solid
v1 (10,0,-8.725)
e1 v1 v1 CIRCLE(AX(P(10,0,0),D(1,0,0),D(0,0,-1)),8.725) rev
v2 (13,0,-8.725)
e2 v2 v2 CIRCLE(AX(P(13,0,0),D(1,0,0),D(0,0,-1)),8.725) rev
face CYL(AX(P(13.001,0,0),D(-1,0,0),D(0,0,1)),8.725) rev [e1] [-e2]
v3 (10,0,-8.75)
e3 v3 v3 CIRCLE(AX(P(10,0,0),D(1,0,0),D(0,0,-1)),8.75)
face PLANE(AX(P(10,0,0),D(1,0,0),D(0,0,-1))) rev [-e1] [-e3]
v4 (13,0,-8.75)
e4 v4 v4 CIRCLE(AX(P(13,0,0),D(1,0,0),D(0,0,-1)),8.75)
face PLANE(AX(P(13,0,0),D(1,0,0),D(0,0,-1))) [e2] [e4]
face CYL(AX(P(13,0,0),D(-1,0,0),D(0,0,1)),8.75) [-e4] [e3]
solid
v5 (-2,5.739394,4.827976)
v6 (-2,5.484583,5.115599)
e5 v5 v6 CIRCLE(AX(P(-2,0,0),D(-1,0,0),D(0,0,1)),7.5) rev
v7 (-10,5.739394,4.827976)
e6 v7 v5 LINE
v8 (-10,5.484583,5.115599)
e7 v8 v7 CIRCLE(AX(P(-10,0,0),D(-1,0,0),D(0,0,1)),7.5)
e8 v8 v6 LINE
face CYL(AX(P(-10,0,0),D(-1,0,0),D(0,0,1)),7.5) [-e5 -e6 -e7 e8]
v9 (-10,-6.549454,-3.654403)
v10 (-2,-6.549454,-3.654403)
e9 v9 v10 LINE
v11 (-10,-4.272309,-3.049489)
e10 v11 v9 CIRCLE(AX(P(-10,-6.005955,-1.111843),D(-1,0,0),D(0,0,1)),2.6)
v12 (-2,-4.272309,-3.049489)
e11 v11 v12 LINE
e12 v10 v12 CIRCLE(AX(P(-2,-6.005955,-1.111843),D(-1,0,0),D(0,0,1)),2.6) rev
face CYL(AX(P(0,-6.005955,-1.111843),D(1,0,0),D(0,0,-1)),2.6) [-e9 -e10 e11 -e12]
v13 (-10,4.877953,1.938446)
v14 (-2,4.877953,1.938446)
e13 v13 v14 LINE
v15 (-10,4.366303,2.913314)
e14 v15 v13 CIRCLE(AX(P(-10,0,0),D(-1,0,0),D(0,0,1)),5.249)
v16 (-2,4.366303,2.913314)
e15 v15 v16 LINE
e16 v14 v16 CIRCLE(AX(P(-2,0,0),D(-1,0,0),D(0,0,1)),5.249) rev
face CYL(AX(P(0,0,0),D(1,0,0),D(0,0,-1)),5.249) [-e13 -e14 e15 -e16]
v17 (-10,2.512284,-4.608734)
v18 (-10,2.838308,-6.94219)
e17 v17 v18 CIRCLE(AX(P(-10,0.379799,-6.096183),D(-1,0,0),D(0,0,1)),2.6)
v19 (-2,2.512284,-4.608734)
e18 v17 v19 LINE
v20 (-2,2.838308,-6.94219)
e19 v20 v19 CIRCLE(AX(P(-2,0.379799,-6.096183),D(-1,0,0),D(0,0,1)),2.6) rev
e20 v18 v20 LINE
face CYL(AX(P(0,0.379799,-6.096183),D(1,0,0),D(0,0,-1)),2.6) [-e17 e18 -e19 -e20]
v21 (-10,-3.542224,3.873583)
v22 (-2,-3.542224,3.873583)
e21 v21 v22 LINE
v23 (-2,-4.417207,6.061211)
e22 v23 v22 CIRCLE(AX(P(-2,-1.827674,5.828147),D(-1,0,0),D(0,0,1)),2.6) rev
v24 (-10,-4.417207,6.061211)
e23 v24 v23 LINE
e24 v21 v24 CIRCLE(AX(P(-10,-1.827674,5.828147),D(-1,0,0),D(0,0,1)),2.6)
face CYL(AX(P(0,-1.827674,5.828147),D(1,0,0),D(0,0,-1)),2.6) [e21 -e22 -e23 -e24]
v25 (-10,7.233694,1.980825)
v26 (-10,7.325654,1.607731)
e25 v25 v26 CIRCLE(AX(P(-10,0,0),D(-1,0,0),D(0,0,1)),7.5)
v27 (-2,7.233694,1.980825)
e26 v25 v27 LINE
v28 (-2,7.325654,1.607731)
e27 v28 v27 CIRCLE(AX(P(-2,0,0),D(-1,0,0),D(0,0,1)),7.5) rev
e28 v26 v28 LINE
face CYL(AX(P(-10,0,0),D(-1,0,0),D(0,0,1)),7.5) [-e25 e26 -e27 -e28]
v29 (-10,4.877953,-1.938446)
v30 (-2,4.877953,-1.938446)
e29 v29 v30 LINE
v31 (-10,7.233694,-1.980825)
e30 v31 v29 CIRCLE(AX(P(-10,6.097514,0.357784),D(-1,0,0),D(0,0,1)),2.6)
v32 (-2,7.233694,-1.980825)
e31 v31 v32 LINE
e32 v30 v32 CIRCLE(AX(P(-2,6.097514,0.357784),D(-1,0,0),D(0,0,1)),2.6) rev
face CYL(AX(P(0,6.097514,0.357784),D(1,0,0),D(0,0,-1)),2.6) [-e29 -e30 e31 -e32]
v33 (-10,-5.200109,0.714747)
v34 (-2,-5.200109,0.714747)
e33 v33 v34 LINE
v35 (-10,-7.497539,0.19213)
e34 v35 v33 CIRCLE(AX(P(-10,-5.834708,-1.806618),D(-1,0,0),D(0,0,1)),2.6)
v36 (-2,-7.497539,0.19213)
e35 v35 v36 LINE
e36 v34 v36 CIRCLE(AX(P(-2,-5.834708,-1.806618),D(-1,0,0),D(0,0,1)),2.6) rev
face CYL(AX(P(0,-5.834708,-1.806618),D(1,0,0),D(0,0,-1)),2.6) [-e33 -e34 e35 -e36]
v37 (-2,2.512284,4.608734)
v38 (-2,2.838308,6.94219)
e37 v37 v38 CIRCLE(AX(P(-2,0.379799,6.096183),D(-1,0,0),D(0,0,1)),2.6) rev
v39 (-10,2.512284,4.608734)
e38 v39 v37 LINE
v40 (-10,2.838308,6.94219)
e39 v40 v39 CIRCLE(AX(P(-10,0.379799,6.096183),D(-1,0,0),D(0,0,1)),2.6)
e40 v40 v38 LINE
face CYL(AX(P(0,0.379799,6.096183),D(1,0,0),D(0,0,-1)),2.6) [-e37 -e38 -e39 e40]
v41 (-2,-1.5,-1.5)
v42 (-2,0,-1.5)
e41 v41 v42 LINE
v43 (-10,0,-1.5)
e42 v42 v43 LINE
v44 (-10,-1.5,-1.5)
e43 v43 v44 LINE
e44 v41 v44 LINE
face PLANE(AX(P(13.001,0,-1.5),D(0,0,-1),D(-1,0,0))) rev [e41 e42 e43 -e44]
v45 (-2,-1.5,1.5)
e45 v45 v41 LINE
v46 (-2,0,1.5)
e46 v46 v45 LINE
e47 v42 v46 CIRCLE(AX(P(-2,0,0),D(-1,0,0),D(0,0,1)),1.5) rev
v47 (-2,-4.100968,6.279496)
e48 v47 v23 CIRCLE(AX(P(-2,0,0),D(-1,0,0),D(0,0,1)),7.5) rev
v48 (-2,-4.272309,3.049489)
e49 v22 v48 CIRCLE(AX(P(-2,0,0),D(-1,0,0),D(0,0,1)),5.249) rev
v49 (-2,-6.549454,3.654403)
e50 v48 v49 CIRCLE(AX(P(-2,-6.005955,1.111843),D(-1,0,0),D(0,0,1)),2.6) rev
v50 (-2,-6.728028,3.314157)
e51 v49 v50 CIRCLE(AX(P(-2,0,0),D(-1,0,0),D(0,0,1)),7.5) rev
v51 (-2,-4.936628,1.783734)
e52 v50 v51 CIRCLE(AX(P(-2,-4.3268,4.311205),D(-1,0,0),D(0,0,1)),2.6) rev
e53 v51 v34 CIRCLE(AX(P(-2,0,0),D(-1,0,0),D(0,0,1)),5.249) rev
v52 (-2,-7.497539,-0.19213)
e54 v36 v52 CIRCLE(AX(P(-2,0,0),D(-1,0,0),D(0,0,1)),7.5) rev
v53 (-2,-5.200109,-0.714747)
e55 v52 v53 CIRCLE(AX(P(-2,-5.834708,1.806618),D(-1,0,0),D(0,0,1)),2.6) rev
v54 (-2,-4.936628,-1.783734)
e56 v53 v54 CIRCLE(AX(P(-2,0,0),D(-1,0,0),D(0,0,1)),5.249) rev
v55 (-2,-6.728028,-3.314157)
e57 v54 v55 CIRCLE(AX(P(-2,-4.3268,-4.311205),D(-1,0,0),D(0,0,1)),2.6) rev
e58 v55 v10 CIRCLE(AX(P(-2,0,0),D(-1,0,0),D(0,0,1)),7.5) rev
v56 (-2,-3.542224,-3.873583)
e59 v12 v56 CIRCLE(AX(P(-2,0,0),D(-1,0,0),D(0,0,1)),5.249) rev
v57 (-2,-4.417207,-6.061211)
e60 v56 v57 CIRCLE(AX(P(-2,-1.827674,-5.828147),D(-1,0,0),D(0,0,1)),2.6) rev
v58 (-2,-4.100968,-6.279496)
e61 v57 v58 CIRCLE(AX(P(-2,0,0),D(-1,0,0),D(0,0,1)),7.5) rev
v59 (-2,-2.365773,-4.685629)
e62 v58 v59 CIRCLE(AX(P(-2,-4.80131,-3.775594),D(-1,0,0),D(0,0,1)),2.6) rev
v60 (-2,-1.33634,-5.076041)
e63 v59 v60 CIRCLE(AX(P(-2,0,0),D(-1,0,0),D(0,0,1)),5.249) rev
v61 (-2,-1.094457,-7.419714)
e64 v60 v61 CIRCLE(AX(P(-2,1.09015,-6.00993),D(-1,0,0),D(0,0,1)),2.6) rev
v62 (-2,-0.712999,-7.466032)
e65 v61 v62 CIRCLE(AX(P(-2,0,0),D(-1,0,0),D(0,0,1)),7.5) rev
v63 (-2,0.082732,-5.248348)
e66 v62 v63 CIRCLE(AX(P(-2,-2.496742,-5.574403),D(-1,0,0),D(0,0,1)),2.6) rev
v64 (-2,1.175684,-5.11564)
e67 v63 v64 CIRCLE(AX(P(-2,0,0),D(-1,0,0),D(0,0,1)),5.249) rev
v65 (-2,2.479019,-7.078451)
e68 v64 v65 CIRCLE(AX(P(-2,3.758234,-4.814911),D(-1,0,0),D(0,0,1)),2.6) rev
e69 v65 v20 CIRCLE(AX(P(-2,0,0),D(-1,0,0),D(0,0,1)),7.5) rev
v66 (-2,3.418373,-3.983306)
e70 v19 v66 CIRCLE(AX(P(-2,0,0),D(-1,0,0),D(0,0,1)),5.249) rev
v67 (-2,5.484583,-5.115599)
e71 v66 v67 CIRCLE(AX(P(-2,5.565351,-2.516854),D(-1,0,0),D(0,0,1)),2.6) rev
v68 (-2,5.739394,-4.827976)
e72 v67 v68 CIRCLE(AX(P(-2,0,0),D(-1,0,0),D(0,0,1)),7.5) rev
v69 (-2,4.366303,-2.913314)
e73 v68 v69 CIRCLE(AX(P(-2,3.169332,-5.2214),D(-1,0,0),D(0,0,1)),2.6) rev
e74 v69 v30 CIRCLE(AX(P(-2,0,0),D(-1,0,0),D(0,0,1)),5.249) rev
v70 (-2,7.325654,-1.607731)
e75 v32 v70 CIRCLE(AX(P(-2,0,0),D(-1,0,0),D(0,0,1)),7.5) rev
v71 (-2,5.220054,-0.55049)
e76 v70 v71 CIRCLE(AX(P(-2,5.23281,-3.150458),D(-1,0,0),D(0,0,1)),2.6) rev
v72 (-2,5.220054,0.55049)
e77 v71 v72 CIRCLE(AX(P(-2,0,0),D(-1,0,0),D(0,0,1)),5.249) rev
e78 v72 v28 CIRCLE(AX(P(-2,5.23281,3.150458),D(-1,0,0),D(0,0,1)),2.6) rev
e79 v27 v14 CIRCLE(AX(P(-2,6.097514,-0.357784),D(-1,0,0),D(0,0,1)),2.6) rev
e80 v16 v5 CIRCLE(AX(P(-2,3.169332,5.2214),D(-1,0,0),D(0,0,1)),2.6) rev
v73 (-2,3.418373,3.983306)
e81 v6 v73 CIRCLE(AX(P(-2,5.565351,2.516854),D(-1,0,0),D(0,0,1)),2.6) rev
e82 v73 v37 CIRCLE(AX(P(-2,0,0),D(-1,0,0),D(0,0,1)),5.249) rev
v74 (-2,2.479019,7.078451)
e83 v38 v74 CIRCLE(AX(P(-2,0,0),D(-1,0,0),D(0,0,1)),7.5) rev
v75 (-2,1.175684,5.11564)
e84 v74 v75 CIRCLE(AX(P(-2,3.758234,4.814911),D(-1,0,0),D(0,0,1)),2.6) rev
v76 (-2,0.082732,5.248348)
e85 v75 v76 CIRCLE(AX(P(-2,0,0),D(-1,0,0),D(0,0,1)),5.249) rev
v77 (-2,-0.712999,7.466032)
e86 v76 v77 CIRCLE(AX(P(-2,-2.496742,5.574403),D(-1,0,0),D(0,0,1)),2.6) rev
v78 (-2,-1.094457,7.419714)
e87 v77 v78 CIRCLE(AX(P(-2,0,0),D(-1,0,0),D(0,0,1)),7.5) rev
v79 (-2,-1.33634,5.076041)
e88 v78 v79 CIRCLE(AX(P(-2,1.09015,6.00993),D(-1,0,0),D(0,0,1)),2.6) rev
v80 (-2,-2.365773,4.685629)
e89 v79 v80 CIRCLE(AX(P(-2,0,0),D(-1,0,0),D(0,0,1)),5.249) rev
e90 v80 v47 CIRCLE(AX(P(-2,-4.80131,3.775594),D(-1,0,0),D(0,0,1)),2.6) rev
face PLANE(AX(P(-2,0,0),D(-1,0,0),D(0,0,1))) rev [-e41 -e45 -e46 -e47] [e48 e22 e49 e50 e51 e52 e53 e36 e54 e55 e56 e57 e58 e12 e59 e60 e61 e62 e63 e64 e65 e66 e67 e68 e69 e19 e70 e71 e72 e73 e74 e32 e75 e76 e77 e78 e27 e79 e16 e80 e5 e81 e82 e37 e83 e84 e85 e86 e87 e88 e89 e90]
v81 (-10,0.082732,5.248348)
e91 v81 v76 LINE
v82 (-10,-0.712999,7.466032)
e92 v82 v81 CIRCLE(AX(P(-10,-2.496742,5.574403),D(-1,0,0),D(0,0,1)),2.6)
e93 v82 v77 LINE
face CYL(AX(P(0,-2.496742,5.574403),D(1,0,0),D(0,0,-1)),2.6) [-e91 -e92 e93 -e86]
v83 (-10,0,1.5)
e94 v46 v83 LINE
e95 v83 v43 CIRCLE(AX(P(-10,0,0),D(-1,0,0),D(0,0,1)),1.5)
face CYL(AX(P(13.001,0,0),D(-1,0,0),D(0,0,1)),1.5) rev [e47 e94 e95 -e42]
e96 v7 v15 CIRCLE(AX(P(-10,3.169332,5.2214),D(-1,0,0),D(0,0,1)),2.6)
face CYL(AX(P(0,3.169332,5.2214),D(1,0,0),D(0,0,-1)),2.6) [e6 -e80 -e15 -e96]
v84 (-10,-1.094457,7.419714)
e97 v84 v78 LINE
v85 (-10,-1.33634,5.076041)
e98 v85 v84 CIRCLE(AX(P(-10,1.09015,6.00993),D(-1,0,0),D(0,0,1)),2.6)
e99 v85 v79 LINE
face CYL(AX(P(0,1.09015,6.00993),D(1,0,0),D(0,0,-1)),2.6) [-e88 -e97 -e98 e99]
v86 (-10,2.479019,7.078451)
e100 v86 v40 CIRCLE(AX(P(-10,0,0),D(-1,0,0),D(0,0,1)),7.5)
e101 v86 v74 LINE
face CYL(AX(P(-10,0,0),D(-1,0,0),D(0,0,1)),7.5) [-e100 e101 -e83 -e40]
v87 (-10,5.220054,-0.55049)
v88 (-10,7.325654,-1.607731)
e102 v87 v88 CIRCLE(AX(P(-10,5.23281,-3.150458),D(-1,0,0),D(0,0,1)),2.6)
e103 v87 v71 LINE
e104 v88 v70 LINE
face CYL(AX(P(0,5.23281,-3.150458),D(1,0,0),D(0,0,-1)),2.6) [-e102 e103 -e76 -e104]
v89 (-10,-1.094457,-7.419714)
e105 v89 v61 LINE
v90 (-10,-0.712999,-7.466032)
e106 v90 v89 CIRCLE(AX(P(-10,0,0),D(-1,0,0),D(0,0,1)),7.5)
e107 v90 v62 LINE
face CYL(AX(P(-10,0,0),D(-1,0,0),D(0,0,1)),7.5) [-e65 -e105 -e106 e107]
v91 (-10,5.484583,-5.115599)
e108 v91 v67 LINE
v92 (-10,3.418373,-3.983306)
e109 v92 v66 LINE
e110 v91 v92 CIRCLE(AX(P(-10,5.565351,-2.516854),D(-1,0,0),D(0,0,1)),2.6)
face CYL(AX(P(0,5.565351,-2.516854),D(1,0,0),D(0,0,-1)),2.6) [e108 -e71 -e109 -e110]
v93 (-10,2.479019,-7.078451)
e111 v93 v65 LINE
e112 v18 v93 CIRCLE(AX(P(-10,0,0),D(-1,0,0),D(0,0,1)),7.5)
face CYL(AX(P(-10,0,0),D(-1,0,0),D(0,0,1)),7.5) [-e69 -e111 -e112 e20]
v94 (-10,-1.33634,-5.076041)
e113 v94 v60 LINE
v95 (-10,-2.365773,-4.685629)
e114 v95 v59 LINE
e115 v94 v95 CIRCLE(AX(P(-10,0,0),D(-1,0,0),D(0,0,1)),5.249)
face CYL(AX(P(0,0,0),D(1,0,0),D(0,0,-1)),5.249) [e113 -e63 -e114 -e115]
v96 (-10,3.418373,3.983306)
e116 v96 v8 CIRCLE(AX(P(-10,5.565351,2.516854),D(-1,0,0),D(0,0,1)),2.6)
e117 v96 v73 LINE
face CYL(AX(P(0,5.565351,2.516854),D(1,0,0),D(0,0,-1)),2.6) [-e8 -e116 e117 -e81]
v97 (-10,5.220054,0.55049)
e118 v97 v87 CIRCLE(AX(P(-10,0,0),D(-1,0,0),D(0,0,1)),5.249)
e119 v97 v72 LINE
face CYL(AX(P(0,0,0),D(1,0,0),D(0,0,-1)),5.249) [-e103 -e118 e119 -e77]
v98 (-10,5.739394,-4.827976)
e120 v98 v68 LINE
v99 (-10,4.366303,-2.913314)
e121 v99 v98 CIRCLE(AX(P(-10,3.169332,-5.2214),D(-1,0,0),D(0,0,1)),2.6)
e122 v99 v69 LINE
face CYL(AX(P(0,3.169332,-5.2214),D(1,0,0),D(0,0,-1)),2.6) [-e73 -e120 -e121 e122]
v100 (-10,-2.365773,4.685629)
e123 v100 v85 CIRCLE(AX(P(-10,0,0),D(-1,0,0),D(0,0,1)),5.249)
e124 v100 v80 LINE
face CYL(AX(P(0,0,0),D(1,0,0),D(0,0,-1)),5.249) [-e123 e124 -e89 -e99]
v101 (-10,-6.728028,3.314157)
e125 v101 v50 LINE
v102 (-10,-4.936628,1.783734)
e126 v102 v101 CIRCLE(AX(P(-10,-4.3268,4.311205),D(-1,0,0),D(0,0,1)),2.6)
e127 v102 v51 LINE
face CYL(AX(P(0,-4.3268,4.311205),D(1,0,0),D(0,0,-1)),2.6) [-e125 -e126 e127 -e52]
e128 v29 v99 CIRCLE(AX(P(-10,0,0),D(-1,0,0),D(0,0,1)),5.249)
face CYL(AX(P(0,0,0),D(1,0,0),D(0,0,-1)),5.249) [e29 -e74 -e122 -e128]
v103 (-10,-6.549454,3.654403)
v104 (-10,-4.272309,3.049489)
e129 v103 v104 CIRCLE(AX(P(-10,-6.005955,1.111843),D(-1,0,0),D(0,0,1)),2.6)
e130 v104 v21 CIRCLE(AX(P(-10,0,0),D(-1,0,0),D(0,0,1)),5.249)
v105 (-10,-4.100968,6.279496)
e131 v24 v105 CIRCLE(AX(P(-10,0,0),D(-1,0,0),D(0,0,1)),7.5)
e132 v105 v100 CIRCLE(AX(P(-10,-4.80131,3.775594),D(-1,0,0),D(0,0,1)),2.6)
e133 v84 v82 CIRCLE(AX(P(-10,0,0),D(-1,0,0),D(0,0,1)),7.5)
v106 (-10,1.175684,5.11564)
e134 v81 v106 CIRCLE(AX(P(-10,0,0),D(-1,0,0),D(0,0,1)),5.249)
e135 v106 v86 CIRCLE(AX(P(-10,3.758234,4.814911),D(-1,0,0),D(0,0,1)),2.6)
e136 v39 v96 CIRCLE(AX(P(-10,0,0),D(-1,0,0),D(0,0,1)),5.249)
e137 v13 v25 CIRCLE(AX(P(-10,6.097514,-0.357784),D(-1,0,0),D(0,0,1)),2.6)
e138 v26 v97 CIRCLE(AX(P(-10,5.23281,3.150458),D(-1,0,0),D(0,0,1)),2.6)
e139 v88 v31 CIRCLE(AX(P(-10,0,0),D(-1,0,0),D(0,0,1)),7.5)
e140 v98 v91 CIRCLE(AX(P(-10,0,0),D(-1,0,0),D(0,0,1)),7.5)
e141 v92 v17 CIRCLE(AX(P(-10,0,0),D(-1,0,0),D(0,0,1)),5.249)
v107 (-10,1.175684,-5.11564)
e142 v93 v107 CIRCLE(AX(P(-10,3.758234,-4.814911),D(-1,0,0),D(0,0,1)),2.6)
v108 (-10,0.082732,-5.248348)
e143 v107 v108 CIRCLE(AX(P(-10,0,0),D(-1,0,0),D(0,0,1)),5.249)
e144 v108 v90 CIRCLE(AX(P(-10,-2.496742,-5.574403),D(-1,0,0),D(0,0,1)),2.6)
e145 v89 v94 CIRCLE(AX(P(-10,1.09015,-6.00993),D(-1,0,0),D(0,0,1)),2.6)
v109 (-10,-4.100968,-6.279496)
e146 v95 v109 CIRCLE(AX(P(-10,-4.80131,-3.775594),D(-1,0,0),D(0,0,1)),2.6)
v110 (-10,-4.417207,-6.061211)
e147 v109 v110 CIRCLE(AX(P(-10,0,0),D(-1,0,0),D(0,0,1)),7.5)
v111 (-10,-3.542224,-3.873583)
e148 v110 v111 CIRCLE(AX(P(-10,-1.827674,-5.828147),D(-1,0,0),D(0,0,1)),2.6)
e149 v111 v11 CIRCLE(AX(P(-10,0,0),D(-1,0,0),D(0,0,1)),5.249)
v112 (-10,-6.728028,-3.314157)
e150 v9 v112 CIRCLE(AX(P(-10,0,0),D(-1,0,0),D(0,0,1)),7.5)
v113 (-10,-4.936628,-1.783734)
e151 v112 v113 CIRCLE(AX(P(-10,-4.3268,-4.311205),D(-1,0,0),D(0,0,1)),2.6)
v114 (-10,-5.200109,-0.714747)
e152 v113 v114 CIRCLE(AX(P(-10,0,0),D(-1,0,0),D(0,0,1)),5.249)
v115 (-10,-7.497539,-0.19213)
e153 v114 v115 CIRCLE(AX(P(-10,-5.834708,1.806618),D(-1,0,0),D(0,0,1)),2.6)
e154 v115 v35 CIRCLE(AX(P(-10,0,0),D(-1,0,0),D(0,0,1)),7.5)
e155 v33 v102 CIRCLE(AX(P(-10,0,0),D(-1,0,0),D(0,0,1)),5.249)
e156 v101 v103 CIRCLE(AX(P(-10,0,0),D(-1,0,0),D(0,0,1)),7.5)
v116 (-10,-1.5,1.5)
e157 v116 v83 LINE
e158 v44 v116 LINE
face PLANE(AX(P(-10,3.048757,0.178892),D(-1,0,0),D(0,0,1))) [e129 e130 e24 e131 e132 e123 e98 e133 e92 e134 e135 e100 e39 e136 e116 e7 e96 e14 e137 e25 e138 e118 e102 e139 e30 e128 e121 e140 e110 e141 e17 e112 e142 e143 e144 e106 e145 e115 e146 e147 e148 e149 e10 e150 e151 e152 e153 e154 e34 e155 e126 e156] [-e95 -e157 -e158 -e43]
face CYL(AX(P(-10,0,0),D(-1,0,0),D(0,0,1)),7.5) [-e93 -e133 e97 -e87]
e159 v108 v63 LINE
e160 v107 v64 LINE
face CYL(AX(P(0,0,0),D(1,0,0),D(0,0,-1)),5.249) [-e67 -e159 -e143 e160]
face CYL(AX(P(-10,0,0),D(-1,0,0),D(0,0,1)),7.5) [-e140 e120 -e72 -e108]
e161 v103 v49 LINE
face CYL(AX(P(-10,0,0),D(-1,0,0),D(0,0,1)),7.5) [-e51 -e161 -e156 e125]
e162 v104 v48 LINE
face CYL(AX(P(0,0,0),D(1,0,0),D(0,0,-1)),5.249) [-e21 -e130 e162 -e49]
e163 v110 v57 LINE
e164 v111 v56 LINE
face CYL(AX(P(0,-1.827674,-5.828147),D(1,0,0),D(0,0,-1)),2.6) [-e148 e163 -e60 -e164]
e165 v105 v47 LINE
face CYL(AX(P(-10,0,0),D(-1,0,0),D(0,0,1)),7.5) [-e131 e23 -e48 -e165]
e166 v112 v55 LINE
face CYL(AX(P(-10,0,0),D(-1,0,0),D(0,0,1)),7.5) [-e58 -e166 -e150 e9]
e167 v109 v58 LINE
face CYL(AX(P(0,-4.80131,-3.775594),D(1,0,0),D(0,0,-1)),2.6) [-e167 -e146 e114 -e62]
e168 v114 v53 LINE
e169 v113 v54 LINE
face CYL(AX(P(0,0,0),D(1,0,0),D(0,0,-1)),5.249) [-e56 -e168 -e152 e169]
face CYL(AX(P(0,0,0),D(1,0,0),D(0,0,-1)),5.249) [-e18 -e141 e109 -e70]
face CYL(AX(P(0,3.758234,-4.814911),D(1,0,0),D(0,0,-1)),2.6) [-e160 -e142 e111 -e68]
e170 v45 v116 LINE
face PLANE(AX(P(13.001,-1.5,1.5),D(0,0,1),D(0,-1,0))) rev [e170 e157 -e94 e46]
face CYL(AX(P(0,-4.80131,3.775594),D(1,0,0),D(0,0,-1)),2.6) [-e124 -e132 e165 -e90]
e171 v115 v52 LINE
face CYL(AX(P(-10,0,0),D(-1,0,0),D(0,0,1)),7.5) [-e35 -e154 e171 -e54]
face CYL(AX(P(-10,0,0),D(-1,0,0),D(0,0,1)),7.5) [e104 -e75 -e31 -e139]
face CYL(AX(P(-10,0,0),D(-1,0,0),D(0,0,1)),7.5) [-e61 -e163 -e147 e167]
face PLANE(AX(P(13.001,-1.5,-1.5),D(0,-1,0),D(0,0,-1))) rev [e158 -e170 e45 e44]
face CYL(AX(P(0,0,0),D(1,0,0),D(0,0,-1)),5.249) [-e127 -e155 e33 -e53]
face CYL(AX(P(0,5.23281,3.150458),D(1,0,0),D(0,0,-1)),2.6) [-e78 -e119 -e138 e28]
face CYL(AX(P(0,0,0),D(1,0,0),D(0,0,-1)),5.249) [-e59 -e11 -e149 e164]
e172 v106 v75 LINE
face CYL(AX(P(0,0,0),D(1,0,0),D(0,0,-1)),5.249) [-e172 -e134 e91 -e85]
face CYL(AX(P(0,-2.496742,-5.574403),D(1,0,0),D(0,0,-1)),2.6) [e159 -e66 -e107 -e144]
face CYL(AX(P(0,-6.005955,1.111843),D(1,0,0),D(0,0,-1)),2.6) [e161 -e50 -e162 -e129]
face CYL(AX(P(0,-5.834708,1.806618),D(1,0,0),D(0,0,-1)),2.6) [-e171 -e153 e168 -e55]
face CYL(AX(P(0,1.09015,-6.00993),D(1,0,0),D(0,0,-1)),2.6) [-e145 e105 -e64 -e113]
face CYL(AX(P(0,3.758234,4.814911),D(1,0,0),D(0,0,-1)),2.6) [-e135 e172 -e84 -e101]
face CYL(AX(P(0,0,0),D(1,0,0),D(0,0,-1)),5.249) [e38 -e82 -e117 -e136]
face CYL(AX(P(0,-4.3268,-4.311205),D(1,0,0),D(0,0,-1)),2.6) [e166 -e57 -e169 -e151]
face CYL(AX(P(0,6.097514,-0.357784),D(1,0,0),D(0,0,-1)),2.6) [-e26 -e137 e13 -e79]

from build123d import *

# Parameters (mm, degrees)
CUT_EXTRUDE1_START         = -10
CUT_EXTRUDE1_DEPTH         = 10
CUT_EXTRUDE2_DEPTH         = 15.577379737
CUT_EXTRUDE3_DEPTH         = 15.577379737
CUT_EXTRUDE4_DEPTH         = 15.577379737
CUT_EXTRUDE5_DEPTH         = 15.577379737
CUT_EXTRUDE6_DEPTH         = 15.577379737
CUT_EXTRUDE7_DEPTH         = 15.577379737
CUT_EXTRUDE8_DEPTH         = 15.577379737
CUT_EXTRUDE9_DEPTH         = 15.577379737
CUT_EXTRUDE10_DEPTH        = 15.559932415
CUT_EXTRUDE11_DEPTH        = 15.559932415
CUT_EXTRUDE12_DEPTH        = 15.559932415
CUT_EXTRUDE13_DEPTH        = 15.559932415
F_0_8_0_8_DIAMETER_HOLE1_D = 0.8
SKETCH20_R                 = 8.75
BOSS_EXTRUDE2_DEPTH        = 3
BOSS_EXTRUDE3_START        = 10
BOSS_EXTRUDE3_DEPTH        = 10
CUT_EXTRUDE14_REACH        = 21.445
SKETCH23_R                 = 8.725
CUT_EXTRUDE15_DEPTH        = 8


with BuildPart() as part:
    # Cut-Extrude1: read off the stored shape, not the designer's step
    # Cut-Extrude1 outline → Cut-Extrude1 (new body)
    with BuildSketch(Plane(origin=(10, 0, 0), x_dir=(0, 0, -1), z_dir=(1, 0, 0)).offset(CUT_EXTRUDE1_START)):
        with BuildLine():
            ThreePointArc((5.115599083, 5.484582575), (-6.172378994, -4.2604856), (6.942190227, 2.838308449))
            ThreePointArc((6.942190227, 2.838308449), (5.736412412, 2.954786958), (4.608733854, 2.512284471))
            ThreePointArc((4.608733854, 2.512284471), (4.319842312, 2.981771856), (3.983306334, 3.41837266))
            ThreePointArc((3.983306334, 3.41837266), (4.796933675, 4.315856884), (5.115599083, 5.484582575))
        make_face()
    extrude(amount=CUT_EXTRUDE1_DEPTH)

    # Sketch3 → Cut-Extrude2 (cut, through all)
    with BuildSketch(Plane(origin=(10, 0, 0), x_dir=(0, 0, -1), z_dir=(1, 0, 0))):
        with BuildLine():
            ThreePointArc((7.466031873, -0.712999344), (7.445316556, 0.904025102), (7.078450644, 2.479019256))
            ThreePointArc((7.078450644, 2.479019256), (6.253152529, 1.592255251), (5.115639582, 1.175683915))
            ThreePointArc((5.115639582, 1.175683915), (5.21072888, 0.632697035), (5.24834797, 0.082732007))
            ThreePointArc((5.24834797, 0.082732007), (6.452498904, -0.049509856), (7.466031873, -0.712999344))
        make_face()
    extrude(amount=-CUT_EXTRUDE2_DEPTH, mode=Mode.SUBTRACT)

    # Sketch4 → Cut-Extrude3 (cut, through all)
    with BuildSketch(Plane(origin=(10, 0, 0), x_dir=(0, 0, -1), z_dir=(1, 0, 0))):
        with BuildLine():
            ThreePointArc((6.279495593, -4.10096758), (7.01262182, -2.659536653), (7.419714468, -1.094457498))
            ThreePointArc((7.419714468, -1.094457498), (6.276849497, -1.496112872), (5.076041451, -1.336339847))
            ThreePointArc((5.076041451, -1.336339847), (4.907900258, -1.861321052), (4.685628816, -2.365773362))
            ThreePointArc((4.685628816, -2.365773362), (5.690395658, -3.042464558), (6.279495593, -4.10096758))
        make_face()
    extrude(amount=-CUT_EXTRUDE3_DEPTH, mode=Mode.SUBTRACT)

    # Sketch5 → Cut-Extrude4 (cut, through all)
    with BuildSketch(Plane(origin=(10, 0, 0), x_dir=(0, 0, -1), z_dir=(1, 0, 0))):
        with BuildLine():
            ThreePointArc((3.654402549, -6.549453566), (4.973419937, -5.613830611), (6.061211124, -4.41720723))
            ThreePointArc((6.061211124, -4.41720723), (4.862595889, -4.241739566), (3.873583397, -3.542224254))
            ThreePointArc((3.873583397, -3.542224254), (3.480730833, -3.928932917), (3.049488568, -4.272308565))
            ThreePointArc((3.049488568, -4.272308565), (3.624691343, -5.338427296), (3.654402549, -6.549453566))
        make_face()
    extrude(amount=-CUT_EXTRUDE4_DEPTH, mode=Mode.SUBTRACT)

    # Sketch6 → Cut-Extrude5 (cut, through all)
    with BuildSketch(Plane(origin=(10, 0, 0), x_dir=(0, 0, -1), z_dir=(1, 0, 0))):
        with BuildLine():
            ThreePointArc((0.192129921, -7.497538669), (1.794867482, -7.282063631), (3.314157357, -6.728028018))
            ThreePointArc((3.314157357, -6.728028018), (2.334380164, -6.015634844), (1.783734068, -4.936627773))
            ThreePointArc((1.783734068, -4.936627773), (1.256167922, -5.0964736), (0.714747239, -5.200109363))
            ThreePointArc((0.714747239, -5.200109363), (0.728613924, -6.411420676), (0.192129921, -7.497538669))
        make_face()
    extrude(amount=-CUT_EXTRUDE5_DEPTH, mode=Mode.SUBTRACT)

    # Sketch7 → Cut-Extrude6 (cut, through all)
    with BuildSketch(Plane(origin=(10, 0, 0), x_dir=(0, 0, -1), z_dir=(1, 0, 0))):
        with BuildLine():
            ThreePointArc((-3.314157357, -6.728028018), (-1.794867482, -7.282063631), (-0.192129921, -7.497538669))
            ThreePointArc((-0.192129921, -7.497538669), (-0.728613924, -6.411420676), (-0.714747239, -5.200109363))
            ThreePointArc((-0.714747239, -5.200109363), (-1.256167922, -5.0964736), (-1.783734068, -4.936627773))
            ThreePointArc((-1.783734068, -4.936627773), (-2.334380164, -6.015634844), (-3.314157357, -6.728028018))
        make_face()
    extrude(amount=-CUT_EXTRUDE6_DEPTH, mode=Mode.SUBTRACT)

    # Sketch8 → Cut-Extrude7 (cut, through all)
    with BuildSketch(Plane(origin=(10, 0, 0), x_dir=(0, 0, -1), z_dir=(1, 0, 0))):
        with BuildLine():
            ThreePointArc((-6.061211124, -4.41720723), (-4.973419937, -5.613830611), (-3.654402549, -6.549453566))
            ThreePointArc((-3.654402549, -6.549453566), (-3.624691343, -5.338427296), (-3.049488568, -4.272308565))
            ThreePointArc((-3.049488568, -4.272308565), (-3.480730833, -3.928932917), (-3.873583397, -3.542224254))
            ThreePointArc((-3.873583397, -3.542224254), (-4.862595889, -4.241739566), (-6.061211124, -4.41720723))
        make_face()
    extrude(amount=-CUT_EXTRUDE7_DEPTH, mode=Mode.SUBTRACT)

    # Sketch9 → Cut-Extrude8 (cut, through all)
    with BuildSketch(Plane(origin=(10, 0, 0), x_dir=(0, 0, -1), z_dir=(1, 0, 0))):
        with BuildLine():
            ThreePointArc((-7.419714468, -1.094457498), (-7.01262182, -2.659536653), (-6.279495593, -4.10096758))
            ThreePointArc((-6.279495593, -4.10096758), (-5.690395658, -3.042464558), (-4.685628816, -2.365773362))
            ThreePointArc((-4.685628816, -2.365773362), (-4.907900258, -1.861321052), (-5.076041451, -1.336339847))
            ThreePointArc((-5.076041451, -1.336339847), (-6.276849497, -1.496112872), (-7.419714468, -1.094457498))
        make_face()
    extrude(amount=-CUT_EXTRUDE8_DEPTH, mode=Mode.SUBTRACT)

    # Sketch10 → Cut-Extrude9 (cut, through all)
    with BuildSketch(Plane(origin=(10, 0, 0), x_dir=(0, 0, -1), z_dir=(1, 0, 0))):
        with BuildLine():
            ThreePointArc((-7.078450644, 2.479019256), (-7.445316556, 0.904025102), (-7.466031873, -0.712999344))
            ThreePointArc((-7.466031873, -0.712999344), (-6.452498904, -0.049509856), (-5.24834797, 0.082732007))
            ThreePointArc((-5.24834797, 0.082732007), (-5.21072888, 0.632697035), (-5.115639582, 1.175683915))
            ThreePointArc((-5.115639582, 1.175683915), (-6.253152529, 1.592255251), (-7.078450644, 2.479019256))
        make_face()
    extrude(amount=-CUT_EXTRUDE9_DEPTH, mode=Mode.SUBTRACT)

    # Sketch11 → Cut-Extrude10 (cut, through all)
    with BuildSketch(Plane(origin=(10, 0, 0), x_dir=(0, 0, -1), z_dir=(1, 0, 0))):
        with BuildLine():
            ThreePointArc((-5.115599083, 5.484582575), (-6.172378994, 4.2604856), (-6.942190227, 2.838308449))
            ThreePointArc((-6.942190227, 2.838308449), (-5.736412412, 2.954786958), (-4.608733854, 2.512284471))
            ThreePointArc((-4.608733854, 2.512284471), (-4.319842312, 2.981771856), (-3.983306334, 3.41837266))
            ThreePointArc((-3.983306334, 3.41837266), (-4.796933675, 4.315856884), (-5.115599083, 5.484582575))
        make_face()
    extrude(amount=-CUT_EXTRUDE10_DEPTH, mode=Mode.SUBTRACT)

    # Sketch12 → Cut-Extrude11 (cut, through all)
    with BuildSketch(Plane(origin=(10, 0, 0), x_dir=(0, 0, -1), z_dir=(1, 0, 0))):
        with BuildLine():
            ThreePointArc((-1.980825421, 7.233694122), (-3.48542379, 6.640920192), (-4.827976462, 5.739393982))
            ThreePointArc((-4.827976462, 5.739393982), (-3.706182968, 5.282177689), (-2.913314353, 4.366302839))
            ThreePointArc((-2.913314353, 4.366302839), (-2.43933193, 4.647758679), (-1.93844561, 4.877953425))
            ThreePointArc((-1.93844561, 4.877953425), (-2.241795126, 6.050747718), (-1.980825421, 7.233694122))
        make_face()
    extrude(amount=-CUT_EXTRUDE11_DEPTH, mode=Mode.SUBTRACT)

    # Sketch13 → Cut-Extrude12 (cut, through all)
    with BuildSketch(Plane(origin=(10, 0, 0), x_dir=(0, 0, -1), z_dir=(1, 0, 0))):
        with BuildLine():
            ThreePointArc((1.607731473, 7.325653521), (0, 7.5), (-1.607731473, 7.325653521))
            ThreePointArc((-1.607731473, 7.325653521), (-0.82691167, 6.399485168), (-0.550489643, 5.220053846))
            ThreePointArc((-0.550489643, 5.220053846), (0, 5.249), (0.550489643, 5.220053846))
            ThreePointArc((0.550489643, 5.220053846), (0.82691167, 6.399485168), (1.607731473, 7.325653521))
        make_face()
    extrude(amount=-CUT_EXTRUDE12_DEPTH, mode=Mode.SUBTRACT)

    # Sketch14 → Cut-Extrude13 (cut, through all)
    with BuildSketch(Plane(origin=(10, 0, 0), x_dir=(0, 0, -1), z_dir=(1, 0, 0))):
        with BuildLine():
            ThreePointArc((4.827976462, 5.739393982), (3.48542379, 6.640920192), (1.980825421, 7.233694122))
            ThreePointArc((1.980825421, 7.233694122), (2.241795126, 6.050747718), (1.93844561, 4.877953425))
            ThreePointArc((1.93844561, 4.877953425), (2.43933193, 4.647758679), (2.913314353, 4.366302839))
            ThreePointArc((2.913314353, 4.366302839), (3.706182968, 5.282177689), (4.827976462, 5.739393982))
        make_face()
    extrude(amount=-CUT_EXTRUDE13_DEPTH, mode=Mode.SUBTRACT)

    # Ø0.8 (0.8) Diameter Hole1 (through all)
    with Locations(Plane(origin=(10, 0, 0), x_dir=(0, 0, -1), z_dir=(1, 0, 0))):
        with Locations((0, 0)):
            Hole(F_0_8_0_8_DIAMETER_HOLE1_D / 2)

    # Sketch20 → Boss-Extrude2 (add)
    with BuildSketch(Plane(origin=(10, 0, 0), x_dir=(0, 0, -1), z_dir=(1, 0, 0))):
        Circle(SKETCH20_R)
    extrude(amount=BOSS_EXTRUDE2_DEPTH)

    # Sketch22 → Boss-Extrude3 (add)
    with BuildSketch(Plane.ZY.offset(BOSS_EXTRUDE3_START)):
        with BuildLine():
            ThreePointArc((-1.93844561, 4.877953425), (-2.43933193, 4.647758679), (-2.913314353, 4.366302839))
            ThreePointArc((-2.913314353, 4.366302839), (-3.706182968, 5.282177689), (-4.827976462, 5.739393982))
            ThreePointArc((-4.827976462, 5.739393982), (-4.973419937, 5.613830611), (-5.115599083, 5.484582575))
            ThreePointArc((-5.115599083, 5.484582575), (-4.796933675, 4.315856884), (-3.983306334, 3.41837266))
            ThreePointArc((-3.983306334, 3.41837266), (-4.319842312, 2.981771856), (-4.608733854, 2.512284471))
            ThreePointArc((-4.608733854, 2.512284471), (-5.736412412, 2.954786958), (-6.942190227, 2.838308449))
            ThreePointArc((-6.942190227, 2.838308449), (-7.01262182, 2.659536653), (-7.078450644, 2.479019256))
            ThreePointArc((-7.078450644, 2.479019256), (-6.253152529, 1.592255251), (-5.115639582, 1.175683915))
            ThreePointArc((-5.115639582, 1.175683915), (-5.21072888, 0.632697035), (-5.24834797, 0.082732007))
            ThreePointArc((-5.24834797, 0.082732007), (-6.452498904, -0.049509856), (-7.466031873, -0.712999344))
            ThreePointArc((-7.466031873, -0.712999344), (-7.445316556, -0.904025102), (-7.419714468, -1.094457498))
            ThreePointArc((-7.419714468, -1.094457498), (-6.276849497, -1.496112872), (-5.076041451, -1.336339847))
            ThreePointArc((-5.076041451, -1.336339847), (-4.907900258, -1.861321052), (-4.685628816, -2.365773362))
            ThreePointArc((-4.685628816, -2.365773362), (-5.690395658, -3.042464558), (-6.279495593, -4.10096758))
            ThreePointArc((-6.279495593, -4.10096758), (-6.172378994, -4.2604856), (-6.061211124, -4.41720723))
            ThreePointArc((-6.061211124, -4.41720723), (-4.862595889, -4.241739566), (-3.873583397, -3.542224254))
            ThreePointArc((-3.873583397, -3.542224254), (-3.480730833, -3.928932917), (-3.049488568, -4.272308565))
            ThreePointArc((-3.049488568, -4.272308565), (-3.624691343, -5.338427296), (-3.654402549, -6.549453566))
            ThreePointArc((-3.654402549, -6.549453566), (-3.48542379, -6.640920192), (-3.314157357, -6.728028018))
            ThreePointArc((-3.314157357, -6.728028018), (-2.334380164, -6.015634844), (-1.783734068, -4.936627773))
            ThreePointArc((-1.783734068, -4.936627773), (-1.256167922, -5.0964736), (-0.714747239, -5.200109363))
            ThreePointArc((-0.714747239, -5.200109363), (-0.728613924, -6.411420676), (-0.192129921, -7.497538669))
            ThreePointArc((-0.192129921, -7.497538669), (0, -7.5), (0.192129921, -7.497538669))
            ThreePointArc((0.192129921, -7.497538669), (0.728613924, -6.411420676), (0.714747239, -5.200109363))
            ThreePointArc((0.714747239, -5.200109363), (1.256167922, -5.0964736), (1.783734068, -4.936627773))
            ThreePointArc((1.783734068, -4.936627773), (2.334380164, -6.015634844), (3.314157357, -6.728028018))
            ThreePointArc((3.314157357, -6.728028018), (3.48542379, -6.640920192), (3.654402549, -6.549453566))
            ThreePointArc((3.654402549, -6.549453566), (3.624691343, -5.338427296), (3.049488568, -4.272308565))
            ThreePointArc((3.049488568, -4.272308565), (3.480730833, -3.928932917), (3.873583397, -3.542224254))
            ThreePointArc((3.873583397, -3.542224254), (4.862595889, -4.241739566), (6.061211124, -4.41720723))
            ThreePointArc((6.061211124, -4.41720723), (6.172378994, -4.2604856), (6.279495593, -4.10096758))
            ThreePointArc((6.279495593, -4.10096758), (5.690395658, -3.042464558), (4.685628816, -2.365773362))
            ThreePointArc((4.685628816, -2.365773362), (4.907900258, -1.861321052), (5.076041451, -1.336339847))
            ThreePointArc((5.076041451, -1.336339847), (6.276849497, -1.496112872), (7.419714468, -1.094457498))
            ThreePointArc((7.419714468, -1.094457498), (7.445316556, -0.904025102), (7.466031873, -0.712999344))
            ThreePointArc((7.466031873, -0.712999344), (6.452498904, -0.049509856), (5.24834797, 0.082732007))
            ThreePointArc((5.24834797, 0.082732007), (5.21072888, 0.632697035), (5.115639582, 1.175683915))
            ThreePointArc((5.115639582, 1.175683915), (6.253152529, 1.592255251), (7.078450644, 2.479019256))
            ThreePointArc((7.078450644, 2.479019256), (7.01262182, 2.659536653), (6.942190227, 2.838308449))
            ThreePointArc((6.942190227, 2.838308449), (5.736412412, 2.954786958), (4.608733854, 2.512284471))
            ThreePointArc((4.608733854, 2.512284471), (4.319842312, 2.981771856), (3.983306334, 3.41837266))
            ThreePointArc((3.983306334, 3.41837266), (4.796933675, 4.315856884), (5.115599083, 5.484582575))
            ThreePointArc((5.115599083, 5.484582575), (4.973419937, 5.613830611), (4.827976462, 5.739393982))
            ThreePointArc((4.827976462, 5.739393982), (3.706182968, 5.282177689), (2.913314353, 4.366302839))
            ThreePointArc((2.913314353, 4.366302839), (2.43933193, 4.647758679), (1.93844561, 4.877953425))
            ThreePointArc((1.93844561, 4.877953425), (2.241795126, 6.050747718), (1.980825421, 7.233694122))
            ThreePointArc((1.980825421, 7.233694122), (1.794867482, 7.282063631), (1.607731473, 7.325653521))
            ThreePointArc((1.607731473, 7.325653521), (0.82691167, 6.399485168), (0.550489643, 5.220053846))
            ThreePointArc((0.550489643, 5.220053846), (0, 5.249), (-0.550489643, 5.220053846))
            ThreePointArc((-0.550489643, 5.220053846), (-0.82691167, 6.399485168), (-1.607731473, 7.325653521))
            ThreePointArc((-1.607731473, 7.325653521), (-1.794867482, 7.282063631), (-1.980825421, 7.233694122))
            ThreePointArc((-1.980825421, 7.233694122), (-2.241795126, 6.050747718), (-1.93844561, 4.877953425))
        make_face()
    extrude(amount=-BOSS_EXTRUDE3_DEPTH)

    # Sketch23 → Cut-Extrude14 (cut, up to next)
    with BuildSketch(Plane.ZY.offset(2), mode=Mode.PRIVATE) as cut_extrude14_sk1:
        with Locations(Location((0, 0, 0), (0, 0, 180))):
            Circle(SKETCH23_R)
    cut_extrude14_tool1 = extrude(cut_extrude14_sk1.sketch, amount=-CUT_EXTRUDE14_REACH, mode=Mode.PRIVATE) & part.part
    add(cut_extrude14_tool1.solids().sort_by_distance((-2, 0, 0))[0], mode=Mode.SUBTRACT)


with BuildPart() as cut_extrude14_piece_1:
    # of the separate pieces the step leaves, piece 1, a body of its own (cut_extrude14_pieces)
    add(part.part.solids().sort_by_distance((-2, 5.739393982, -4.827976462))[0])

    # Sketch24 → Cut-Extrude15 (cut)
    with BuildSketch(Plane.ZY.offset(10)):
        with BuildLine():
            Line((-1.5, 0), (-1.5, -1.5))
            Line((-1.5, -1.5), (1.5, -1.5))
            Line((1.5, -1.5), (1.5, 0))
            ThreePointArc((1.5, 0), (0, 1.5), (-1.5, 0))
        make_face()
    extrude(amount=-CUT_EXTRUDE15_DEPTH, mode=Mode.SUBTRACT)


with BuildPart() as cut_extrude14_piece_2:
    # of the separate pieces the step leaves, piece 2, a body of its own (cut_extrude14_pieces)
    add(part.part.solids().sort_by_distance((10, 0, -8.75))[0])


solid = Compound([cut_extrude14_piece_1.part, cut_extrude14_piece_2.part])
